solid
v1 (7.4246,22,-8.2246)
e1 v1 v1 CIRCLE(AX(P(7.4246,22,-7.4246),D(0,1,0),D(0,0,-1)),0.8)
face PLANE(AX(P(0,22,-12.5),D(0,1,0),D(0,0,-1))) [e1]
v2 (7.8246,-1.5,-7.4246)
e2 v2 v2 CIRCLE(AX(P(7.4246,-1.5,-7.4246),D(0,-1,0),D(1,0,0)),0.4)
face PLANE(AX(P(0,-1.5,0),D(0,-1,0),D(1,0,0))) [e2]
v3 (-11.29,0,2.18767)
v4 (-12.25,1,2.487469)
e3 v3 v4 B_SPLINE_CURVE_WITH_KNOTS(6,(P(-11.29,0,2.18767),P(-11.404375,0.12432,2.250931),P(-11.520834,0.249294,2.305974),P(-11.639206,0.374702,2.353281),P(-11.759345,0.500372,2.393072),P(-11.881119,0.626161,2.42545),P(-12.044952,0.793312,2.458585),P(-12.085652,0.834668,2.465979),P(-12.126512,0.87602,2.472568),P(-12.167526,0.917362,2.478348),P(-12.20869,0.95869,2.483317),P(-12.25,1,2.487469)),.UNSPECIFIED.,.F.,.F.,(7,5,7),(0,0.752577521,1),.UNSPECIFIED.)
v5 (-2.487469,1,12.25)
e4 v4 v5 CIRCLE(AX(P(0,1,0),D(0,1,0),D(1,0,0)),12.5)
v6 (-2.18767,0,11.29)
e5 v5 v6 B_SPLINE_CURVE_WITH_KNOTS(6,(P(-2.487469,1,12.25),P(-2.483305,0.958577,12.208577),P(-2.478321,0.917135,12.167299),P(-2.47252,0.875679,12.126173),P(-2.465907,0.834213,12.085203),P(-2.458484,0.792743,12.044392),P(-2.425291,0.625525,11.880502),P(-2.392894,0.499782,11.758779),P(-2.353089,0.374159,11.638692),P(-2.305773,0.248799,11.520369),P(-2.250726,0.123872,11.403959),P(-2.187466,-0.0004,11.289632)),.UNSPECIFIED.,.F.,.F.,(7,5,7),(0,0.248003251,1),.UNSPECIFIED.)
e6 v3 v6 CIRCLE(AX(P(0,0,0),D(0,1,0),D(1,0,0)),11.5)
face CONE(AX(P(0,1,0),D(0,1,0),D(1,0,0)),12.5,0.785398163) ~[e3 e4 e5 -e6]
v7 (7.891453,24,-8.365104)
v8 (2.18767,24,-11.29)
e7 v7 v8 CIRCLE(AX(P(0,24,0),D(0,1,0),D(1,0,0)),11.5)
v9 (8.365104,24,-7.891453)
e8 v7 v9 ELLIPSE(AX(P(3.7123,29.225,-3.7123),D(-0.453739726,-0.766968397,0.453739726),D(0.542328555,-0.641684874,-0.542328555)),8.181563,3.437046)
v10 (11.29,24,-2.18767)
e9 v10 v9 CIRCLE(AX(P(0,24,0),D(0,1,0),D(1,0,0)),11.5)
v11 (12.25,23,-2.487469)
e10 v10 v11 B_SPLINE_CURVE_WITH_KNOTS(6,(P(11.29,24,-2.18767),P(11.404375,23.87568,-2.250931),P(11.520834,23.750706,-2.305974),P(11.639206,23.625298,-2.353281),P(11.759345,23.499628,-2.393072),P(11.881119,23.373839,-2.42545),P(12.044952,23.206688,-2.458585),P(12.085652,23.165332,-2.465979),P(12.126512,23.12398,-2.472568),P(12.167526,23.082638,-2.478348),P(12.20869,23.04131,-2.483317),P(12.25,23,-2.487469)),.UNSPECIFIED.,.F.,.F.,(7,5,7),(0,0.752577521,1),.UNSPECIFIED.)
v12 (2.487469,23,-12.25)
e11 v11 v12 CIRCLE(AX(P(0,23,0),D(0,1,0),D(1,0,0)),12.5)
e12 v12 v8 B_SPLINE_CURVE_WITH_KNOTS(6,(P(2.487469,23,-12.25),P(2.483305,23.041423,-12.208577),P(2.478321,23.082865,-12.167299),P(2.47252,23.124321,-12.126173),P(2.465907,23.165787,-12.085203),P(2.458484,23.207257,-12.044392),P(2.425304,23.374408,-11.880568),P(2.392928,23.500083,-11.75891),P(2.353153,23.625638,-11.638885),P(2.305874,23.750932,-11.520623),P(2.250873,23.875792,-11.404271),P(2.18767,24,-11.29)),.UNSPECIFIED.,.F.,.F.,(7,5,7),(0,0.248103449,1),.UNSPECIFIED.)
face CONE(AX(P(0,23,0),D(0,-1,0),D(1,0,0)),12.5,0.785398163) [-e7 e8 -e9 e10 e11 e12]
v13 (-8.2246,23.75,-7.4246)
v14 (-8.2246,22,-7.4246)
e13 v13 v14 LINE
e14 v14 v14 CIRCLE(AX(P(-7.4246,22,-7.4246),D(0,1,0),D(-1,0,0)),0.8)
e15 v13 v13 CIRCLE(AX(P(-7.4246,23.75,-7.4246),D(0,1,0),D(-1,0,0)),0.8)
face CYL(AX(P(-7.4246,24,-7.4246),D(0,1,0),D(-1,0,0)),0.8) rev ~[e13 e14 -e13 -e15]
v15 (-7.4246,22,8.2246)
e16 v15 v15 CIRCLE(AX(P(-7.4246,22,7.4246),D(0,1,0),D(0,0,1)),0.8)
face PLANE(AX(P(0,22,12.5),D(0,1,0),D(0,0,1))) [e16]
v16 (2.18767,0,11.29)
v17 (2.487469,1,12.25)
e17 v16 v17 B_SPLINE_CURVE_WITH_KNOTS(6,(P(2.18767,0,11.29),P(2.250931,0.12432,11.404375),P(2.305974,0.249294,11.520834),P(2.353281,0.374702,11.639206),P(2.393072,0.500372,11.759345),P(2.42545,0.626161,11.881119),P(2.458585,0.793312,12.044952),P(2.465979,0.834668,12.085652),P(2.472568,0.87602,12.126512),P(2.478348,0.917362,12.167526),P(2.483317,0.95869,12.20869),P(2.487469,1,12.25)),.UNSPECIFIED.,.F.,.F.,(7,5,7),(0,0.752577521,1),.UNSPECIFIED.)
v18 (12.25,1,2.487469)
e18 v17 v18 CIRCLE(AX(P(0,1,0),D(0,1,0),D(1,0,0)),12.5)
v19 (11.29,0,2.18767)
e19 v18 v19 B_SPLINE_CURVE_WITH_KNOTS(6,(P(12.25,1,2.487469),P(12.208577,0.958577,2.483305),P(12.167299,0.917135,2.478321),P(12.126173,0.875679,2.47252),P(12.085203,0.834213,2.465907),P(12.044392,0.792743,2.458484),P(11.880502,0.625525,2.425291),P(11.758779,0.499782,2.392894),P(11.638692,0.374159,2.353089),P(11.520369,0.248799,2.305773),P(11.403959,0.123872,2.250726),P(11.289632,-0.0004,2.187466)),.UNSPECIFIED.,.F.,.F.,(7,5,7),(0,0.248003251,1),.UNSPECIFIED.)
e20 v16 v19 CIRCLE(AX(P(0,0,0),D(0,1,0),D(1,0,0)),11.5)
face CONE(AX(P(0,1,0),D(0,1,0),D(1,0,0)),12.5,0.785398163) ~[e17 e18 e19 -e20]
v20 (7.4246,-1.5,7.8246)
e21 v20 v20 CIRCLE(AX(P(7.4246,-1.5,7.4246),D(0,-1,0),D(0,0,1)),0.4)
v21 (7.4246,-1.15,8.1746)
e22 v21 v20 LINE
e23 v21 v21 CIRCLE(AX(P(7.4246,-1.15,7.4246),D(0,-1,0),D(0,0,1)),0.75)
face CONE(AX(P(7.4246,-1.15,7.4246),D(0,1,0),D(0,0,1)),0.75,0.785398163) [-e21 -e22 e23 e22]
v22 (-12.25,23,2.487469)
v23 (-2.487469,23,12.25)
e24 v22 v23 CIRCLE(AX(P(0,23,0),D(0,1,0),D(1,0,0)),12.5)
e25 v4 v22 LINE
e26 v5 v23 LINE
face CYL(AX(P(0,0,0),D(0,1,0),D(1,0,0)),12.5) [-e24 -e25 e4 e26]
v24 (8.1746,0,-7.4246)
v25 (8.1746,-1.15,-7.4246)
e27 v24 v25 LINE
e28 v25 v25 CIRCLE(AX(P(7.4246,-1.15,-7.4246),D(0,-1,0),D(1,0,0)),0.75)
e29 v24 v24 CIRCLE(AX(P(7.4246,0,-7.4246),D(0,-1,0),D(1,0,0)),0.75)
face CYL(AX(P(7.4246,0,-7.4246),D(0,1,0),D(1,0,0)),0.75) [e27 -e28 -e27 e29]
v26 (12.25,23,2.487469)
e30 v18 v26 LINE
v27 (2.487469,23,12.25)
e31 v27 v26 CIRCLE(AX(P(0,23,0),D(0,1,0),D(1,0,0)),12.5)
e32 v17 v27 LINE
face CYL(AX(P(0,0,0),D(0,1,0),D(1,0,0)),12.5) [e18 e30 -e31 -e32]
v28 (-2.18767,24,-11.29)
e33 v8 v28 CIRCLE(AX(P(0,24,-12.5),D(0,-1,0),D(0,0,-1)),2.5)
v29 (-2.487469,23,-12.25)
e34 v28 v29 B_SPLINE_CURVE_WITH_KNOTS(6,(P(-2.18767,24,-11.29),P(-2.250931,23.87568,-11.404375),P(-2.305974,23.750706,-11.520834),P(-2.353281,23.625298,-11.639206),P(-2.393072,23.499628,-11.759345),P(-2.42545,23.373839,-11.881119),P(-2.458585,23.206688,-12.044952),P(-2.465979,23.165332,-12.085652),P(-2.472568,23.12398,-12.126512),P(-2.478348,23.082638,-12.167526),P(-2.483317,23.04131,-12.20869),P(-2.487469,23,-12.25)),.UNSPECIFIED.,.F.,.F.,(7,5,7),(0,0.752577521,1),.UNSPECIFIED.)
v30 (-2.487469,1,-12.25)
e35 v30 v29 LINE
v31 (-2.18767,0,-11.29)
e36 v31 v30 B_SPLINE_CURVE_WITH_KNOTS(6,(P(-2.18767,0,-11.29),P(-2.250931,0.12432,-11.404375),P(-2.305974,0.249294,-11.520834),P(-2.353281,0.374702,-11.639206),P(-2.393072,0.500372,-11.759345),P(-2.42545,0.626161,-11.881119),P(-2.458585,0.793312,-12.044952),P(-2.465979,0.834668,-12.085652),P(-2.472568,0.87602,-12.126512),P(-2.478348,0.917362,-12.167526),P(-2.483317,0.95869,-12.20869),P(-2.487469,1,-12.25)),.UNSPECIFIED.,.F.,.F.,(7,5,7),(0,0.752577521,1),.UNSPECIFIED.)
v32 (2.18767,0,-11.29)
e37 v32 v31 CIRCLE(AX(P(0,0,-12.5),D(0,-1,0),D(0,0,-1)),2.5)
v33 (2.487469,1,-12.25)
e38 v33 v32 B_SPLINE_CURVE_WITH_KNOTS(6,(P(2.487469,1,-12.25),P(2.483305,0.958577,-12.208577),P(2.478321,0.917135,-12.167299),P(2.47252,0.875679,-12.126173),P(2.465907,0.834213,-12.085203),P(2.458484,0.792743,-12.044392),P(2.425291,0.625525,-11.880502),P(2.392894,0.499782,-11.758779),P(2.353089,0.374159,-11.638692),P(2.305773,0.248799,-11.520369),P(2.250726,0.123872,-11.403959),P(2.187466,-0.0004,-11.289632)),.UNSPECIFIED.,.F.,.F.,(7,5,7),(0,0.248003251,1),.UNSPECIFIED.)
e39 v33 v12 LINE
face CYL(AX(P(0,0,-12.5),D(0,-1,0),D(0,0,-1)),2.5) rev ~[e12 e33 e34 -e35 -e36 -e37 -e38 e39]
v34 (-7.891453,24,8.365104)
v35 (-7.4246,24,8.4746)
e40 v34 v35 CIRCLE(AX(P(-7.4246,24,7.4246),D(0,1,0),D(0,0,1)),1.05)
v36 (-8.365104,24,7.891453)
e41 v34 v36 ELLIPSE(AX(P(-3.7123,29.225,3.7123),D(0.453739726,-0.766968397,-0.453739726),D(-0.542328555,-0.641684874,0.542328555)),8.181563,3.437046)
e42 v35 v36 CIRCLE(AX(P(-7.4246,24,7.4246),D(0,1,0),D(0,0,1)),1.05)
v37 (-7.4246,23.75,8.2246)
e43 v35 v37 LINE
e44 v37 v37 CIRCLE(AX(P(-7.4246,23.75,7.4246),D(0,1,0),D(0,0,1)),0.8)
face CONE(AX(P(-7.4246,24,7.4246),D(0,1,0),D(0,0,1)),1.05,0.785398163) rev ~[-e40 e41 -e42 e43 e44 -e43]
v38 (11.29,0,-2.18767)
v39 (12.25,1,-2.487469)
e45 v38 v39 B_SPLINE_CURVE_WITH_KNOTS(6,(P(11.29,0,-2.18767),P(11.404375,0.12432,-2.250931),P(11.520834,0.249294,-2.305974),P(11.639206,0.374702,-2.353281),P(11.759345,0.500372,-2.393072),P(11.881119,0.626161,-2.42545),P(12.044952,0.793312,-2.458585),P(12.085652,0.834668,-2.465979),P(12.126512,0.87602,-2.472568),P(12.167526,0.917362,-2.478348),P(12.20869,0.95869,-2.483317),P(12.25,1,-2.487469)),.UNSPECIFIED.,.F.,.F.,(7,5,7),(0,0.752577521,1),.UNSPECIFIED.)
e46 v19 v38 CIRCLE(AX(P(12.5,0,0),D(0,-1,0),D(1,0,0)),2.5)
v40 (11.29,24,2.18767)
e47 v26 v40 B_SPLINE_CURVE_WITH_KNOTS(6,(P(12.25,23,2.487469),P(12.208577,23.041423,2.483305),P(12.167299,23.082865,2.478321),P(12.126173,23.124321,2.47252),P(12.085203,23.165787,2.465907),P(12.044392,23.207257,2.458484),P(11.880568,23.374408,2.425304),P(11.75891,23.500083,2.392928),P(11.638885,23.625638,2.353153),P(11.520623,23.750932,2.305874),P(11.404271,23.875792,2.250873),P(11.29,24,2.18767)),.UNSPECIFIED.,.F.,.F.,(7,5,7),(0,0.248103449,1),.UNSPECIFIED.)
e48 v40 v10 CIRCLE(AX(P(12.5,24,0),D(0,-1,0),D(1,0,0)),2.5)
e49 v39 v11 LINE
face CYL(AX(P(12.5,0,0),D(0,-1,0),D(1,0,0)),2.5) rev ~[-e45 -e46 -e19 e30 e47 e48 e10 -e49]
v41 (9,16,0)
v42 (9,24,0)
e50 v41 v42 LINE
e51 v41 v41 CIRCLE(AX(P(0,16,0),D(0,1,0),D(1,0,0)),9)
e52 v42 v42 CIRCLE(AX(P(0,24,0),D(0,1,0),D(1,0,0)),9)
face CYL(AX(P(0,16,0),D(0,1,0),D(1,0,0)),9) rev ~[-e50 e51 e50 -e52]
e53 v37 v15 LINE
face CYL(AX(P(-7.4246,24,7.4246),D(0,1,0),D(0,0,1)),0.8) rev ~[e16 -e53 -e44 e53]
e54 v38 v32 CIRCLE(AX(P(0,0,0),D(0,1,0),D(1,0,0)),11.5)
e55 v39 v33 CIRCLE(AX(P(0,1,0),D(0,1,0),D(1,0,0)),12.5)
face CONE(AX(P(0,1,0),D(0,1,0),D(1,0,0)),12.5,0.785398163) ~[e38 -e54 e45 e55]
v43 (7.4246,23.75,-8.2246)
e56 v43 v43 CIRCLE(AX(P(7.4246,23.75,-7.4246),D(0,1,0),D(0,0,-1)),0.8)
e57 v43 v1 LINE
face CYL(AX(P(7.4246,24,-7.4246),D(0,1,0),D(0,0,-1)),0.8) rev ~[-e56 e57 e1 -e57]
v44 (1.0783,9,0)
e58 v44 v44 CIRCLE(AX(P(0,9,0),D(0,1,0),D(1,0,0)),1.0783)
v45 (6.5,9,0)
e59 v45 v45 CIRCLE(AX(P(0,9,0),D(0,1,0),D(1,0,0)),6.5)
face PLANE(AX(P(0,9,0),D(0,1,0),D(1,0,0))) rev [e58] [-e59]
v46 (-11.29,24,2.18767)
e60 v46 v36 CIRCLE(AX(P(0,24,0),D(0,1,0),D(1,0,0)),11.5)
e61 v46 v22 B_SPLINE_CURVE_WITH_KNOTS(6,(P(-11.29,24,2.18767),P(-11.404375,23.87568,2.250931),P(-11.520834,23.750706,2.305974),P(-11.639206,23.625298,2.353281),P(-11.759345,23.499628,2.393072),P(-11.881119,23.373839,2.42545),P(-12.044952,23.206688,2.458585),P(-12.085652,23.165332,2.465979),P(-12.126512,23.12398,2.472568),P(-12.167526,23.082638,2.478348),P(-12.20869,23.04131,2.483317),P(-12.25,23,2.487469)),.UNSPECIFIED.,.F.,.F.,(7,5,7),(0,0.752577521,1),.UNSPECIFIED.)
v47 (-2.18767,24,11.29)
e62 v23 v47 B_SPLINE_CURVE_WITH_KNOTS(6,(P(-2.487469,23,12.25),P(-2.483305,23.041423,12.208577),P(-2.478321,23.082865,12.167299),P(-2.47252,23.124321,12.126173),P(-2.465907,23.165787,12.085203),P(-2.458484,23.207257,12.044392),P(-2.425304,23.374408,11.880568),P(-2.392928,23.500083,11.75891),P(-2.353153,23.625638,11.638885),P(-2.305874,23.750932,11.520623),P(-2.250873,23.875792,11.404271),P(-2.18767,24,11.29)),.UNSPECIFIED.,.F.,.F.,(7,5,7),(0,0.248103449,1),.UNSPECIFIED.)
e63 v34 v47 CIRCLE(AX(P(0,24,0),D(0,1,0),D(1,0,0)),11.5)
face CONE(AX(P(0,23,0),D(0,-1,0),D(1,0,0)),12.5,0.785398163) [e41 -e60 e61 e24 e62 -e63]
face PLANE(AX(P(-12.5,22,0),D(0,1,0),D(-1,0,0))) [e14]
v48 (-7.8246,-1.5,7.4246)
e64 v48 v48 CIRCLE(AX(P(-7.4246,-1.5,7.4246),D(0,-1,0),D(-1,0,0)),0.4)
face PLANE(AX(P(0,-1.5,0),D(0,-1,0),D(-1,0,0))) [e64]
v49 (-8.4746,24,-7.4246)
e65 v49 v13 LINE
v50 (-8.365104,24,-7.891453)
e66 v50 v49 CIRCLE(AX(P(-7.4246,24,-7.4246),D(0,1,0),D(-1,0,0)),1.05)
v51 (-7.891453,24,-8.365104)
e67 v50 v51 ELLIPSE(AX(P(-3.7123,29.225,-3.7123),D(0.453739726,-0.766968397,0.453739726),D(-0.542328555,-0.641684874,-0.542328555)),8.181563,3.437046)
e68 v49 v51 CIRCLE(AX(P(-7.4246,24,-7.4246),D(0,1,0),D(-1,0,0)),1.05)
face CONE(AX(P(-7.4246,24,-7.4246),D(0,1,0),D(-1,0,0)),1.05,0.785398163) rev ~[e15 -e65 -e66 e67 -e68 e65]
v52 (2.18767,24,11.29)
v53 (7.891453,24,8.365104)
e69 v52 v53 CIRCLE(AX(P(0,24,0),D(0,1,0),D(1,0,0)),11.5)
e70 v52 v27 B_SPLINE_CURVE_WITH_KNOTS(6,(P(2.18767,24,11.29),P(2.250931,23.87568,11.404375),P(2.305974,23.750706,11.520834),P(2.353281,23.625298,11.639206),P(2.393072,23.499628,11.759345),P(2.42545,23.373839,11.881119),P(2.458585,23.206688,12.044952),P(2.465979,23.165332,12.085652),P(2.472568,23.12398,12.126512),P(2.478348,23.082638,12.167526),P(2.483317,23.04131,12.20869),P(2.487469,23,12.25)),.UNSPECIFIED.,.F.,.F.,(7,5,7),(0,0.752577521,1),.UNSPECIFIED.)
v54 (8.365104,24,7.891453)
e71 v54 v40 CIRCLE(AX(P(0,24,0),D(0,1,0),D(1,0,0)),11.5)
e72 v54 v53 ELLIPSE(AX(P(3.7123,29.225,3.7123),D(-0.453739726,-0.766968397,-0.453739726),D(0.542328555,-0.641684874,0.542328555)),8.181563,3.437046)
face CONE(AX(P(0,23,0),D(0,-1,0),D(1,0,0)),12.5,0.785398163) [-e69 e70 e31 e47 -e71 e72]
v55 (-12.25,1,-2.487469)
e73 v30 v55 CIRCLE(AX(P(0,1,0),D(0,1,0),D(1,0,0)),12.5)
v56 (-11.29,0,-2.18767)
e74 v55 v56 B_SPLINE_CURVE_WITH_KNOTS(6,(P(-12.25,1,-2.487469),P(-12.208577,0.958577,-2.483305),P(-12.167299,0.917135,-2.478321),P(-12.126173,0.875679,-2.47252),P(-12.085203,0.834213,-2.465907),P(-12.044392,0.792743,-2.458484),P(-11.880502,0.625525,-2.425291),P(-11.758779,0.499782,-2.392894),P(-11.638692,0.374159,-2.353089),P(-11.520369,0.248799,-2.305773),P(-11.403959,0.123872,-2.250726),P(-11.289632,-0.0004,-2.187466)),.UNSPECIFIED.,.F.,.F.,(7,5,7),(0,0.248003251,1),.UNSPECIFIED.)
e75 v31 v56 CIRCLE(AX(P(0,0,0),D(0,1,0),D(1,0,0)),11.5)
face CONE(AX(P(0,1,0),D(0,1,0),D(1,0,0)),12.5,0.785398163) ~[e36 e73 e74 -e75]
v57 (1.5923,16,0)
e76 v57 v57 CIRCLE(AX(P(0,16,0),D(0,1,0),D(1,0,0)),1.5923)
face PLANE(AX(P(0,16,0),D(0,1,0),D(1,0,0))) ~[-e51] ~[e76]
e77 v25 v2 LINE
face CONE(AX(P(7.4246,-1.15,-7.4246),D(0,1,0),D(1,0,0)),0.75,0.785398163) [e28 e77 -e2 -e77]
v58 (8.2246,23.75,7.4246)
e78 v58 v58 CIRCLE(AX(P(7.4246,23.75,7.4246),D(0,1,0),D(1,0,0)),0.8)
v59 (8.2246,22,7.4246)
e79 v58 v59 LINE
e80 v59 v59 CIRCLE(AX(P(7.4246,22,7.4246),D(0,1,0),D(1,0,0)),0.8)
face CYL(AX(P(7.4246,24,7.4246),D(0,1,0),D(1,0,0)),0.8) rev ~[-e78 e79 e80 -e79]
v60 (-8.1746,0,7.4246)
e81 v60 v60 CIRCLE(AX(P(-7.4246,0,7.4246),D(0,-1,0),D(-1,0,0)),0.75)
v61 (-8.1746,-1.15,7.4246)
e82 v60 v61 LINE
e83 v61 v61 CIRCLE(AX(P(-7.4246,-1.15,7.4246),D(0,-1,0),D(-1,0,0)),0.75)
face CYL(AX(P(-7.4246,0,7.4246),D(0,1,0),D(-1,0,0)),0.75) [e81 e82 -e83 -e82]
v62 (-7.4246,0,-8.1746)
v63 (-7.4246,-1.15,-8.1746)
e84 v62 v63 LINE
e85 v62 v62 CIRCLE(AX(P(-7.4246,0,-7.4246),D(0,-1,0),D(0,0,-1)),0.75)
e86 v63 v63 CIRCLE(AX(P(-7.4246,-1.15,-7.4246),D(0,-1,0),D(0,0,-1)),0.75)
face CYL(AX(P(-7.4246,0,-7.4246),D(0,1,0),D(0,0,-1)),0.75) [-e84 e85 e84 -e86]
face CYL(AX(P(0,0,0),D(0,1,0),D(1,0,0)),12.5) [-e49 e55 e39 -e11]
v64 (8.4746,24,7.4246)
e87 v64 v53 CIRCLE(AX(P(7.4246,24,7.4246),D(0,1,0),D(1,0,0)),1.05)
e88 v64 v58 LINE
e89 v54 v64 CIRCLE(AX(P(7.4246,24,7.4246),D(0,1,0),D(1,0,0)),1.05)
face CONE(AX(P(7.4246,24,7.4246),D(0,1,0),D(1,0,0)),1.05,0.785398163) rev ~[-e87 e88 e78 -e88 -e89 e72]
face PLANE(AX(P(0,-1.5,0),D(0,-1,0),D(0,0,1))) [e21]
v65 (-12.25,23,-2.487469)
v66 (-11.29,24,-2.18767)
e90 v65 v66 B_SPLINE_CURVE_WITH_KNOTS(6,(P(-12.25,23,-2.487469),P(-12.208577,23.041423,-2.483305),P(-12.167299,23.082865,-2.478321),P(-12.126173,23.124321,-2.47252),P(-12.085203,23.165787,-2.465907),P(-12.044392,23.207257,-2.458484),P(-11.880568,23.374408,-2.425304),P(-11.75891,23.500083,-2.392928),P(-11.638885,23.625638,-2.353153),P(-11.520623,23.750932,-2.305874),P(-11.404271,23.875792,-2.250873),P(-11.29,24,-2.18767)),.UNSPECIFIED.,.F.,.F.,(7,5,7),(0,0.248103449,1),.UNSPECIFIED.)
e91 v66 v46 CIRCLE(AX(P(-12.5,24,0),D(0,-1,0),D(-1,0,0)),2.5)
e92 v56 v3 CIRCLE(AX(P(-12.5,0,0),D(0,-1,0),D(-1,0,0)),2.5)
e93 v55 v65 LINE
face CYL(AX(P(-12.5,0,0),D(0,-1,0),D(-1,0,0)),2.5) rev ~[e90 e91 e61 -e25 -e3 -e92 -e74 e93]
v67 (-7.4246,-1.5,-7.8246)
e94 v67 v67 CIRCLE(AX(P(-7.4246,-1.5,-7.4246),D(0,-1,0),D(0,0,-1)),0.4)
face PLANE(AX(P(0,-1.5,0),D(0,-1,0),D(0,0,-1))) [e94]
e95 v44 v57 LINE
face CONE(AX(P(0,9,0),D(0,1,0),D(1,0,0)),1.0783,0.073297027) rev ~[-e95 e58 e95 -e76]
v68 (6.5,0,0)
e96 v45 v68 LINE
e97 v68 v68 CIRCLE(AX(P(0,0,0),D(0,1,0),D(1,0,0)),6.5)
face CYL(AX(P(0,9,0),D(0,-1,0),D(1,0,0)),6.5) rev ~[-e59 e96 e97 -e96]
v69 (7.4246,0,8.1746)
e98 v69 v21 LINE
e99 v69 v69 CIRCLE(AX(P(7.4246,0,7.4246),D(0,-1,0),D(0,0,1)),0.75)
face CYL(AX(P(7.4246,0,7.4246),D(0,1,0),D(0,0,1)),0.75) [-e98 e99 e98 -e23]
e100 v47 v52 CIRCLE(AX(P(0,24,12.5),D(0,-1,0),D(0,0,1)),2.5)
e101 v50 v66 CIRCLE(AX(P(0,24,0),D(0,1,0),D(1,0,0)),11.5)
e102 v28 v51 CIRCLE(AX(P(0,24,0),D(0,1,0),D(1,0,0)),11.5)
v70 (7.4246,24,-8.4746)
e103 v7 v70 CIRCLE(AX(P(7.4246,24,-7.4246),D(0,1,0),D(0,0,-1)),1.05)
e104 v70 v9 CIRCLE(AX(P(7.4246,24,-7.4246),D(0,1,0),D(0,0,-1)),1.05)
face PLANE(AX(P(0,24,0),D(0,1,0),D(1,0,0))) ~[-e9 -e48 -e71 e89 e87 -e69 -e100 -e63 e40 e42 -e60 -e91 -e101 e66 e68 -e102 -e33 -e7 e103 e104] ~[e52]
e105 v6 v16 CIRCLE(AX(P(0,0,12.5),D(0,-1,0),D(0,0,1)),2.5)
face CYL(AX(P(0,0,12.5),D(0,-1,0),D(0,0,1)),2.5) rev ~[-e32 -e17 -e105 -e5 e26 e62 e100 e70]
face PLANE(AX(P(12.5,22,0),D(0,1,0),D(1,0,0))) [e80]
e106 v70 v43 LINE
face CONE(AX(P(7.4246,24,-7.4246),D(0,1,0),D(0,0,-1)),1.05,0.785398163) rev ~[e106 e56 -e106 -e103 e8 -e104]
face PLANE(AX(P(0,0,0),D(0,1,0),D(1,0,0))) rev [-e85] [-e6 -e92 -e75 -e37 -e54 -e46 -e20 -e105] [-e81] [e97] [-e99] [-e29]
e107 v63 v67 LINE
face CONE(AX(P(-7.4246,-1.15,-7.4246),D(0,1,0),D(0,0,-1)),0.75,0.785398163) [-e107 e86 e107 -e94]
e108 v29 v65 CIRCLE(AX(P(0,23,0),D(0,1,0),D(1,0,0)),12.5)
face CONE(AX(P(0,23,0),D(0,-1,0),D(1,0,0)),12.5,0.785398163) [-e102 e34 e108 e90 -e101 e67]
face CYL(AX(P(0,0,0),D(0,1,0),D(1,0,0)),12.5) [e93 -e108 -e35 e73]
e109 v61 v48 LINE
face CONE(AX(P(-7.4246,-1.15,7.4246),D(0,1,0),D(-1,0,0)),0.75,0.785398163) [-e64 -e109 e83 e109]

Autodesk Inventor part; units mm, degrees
ref_plane "YZ Plane" through (0, 0, 0) normal (1, 0, 0) x (0, 1, 0)
ref_plane "XZ Plane" through (0, 0, 0) normal (0, 1, 0) x (-1, 0, 0)
ref_plane "XY Plane" through (0, 0, 0) normal (0, 0, 1) x (1, 0, 0)
sketch "Sketch1" plane through (0, 0, 0) normal (0, 0, 1) x (1, 0, 0)
  line L0 (0, 0) -> (0, 19.4488) construction
  line L1 (0, 0) -> (15.8946, 0) construction
  line L2 (1.0783, 9) -> (1.5923, 16)
  line L3 (1.0783, 9) -> (6.5, 9)
  line L4 (6.5, 9) -> (6.5, 0)
  line L5 (6.5, 0) -> (12.5, 0)
  line L6 (12.5, 0) -> (12.5, 24)
  line L7 (1.5923, 16) -> (9, 16)
  line L8 (9, 16) -> (9, 24)
  line L9 (9, 24) -> (12.5, 24)
  line L10 (1.0783, 9) -> (1.0049, 8) construction
  line L11 (1.0049, 8) -> (0.7849, 8) construction
  line L12 (1.5923, 16) -> (2.5, 28.36) construction
  line L13 (2.5, 28.36) -> (1.5, 28.36) construction
  line L14 (0.7849, 8) -> (0.4645, 1) construction
  line L15 (0.4645, 1) -> (0.2, 1) construction
  line L16 (0.2, 1) -> (1.5, 28.36) construction
  line L17 (0, 6.7) -> (1.1563, 6.7) construction
  line L18 (0.4708, 6.7) -> (0.4708, 8.6077) construction
  dimension "d1" = 12.5
  dimension "d2" = 6.5
  dimension "d7" = 9
  dimension "d8" = 9
  dimension "d45" = 24
  dimension "d46" = 8
  dimension "d47" = 4.2
  dimension "d49" = 20.36
  dimension "d50" = 2.5
  dimension "d51" = 2.62
  dimension "d53" = 0.22
  dimension "d54" = 7
  dimension "d55" = 0.2
  dimension "d56" = 1
  dimension "d57" = 5.7
  dimension "d58" = 2.3
revolve "Revolution1" add sketch "Sketch1" angle 360 about axis through (0, 0, 0) along (0, 1, 0)
chamfer "Chamfer2" distance 1 angle 45 2 edges at (-12.5, 0, 0) (-12.5, 24, 0)
sketch "Sketch2" plane through (0, 0, 0) normal (0, -1, 0) x (1, 0, 0)
  circle A0 centre (0, 0) radius 1.0783 construction
  circle A1 centre (0, 0) radius 10.5 construction
  circle A2 centre (0, 0) radius 1.5923 construction
  line L0 (0, 0) -> (19.4803, 0) construction
  line L1 (0, 0) -> (20.4554, -20.4554) construction
  circle A3 centre (7.4246, -7.4246) radius 0.75
  circle A4 centre (0, 0) radius 12.5
  circle A5 centre (12.5, 0) radius 2.5
  point P0 (12.25, 2.4875)
  point P1 (12.25, -2.4875)
  dimension "d19" = 21
  dimension "d23" = 25
  dimension "d20" = 45
  dimension "d21" = 1.5
  dimension "d22" = 5
extrude "Extrusion1" cut sketch "Sketch2" against normal through all contours A4 A5 picked at (11.6823, -0.4803)
extrude "Extrusion2" add sketch "Sketch2" along normal blind 1.5 contours A3
chamfer "Chamfer3" distance 0.35 angle 45 1 edges at (6.6746, -1.5, -7.4246)
pattern_circular "Circular Pattern1" count 4 over 360 about axis through (0, -10, 0) along (0, 1, 0) of "Extrusion1", "Extrusion2", "Chamfer3"
sketch "Sketch3" plane through (12.5, 24, 0) normal (0, 1, 0) x (1, 0, 0)
  circle A0 centre (-12.5, 0) radius 1.0783 construction
  line L0 (-12.5, 0) -> (0.4785, 0) construction
  line L1 (-12.5, 0) -> (-1.2806, -11.2194) construction
  circle A1 centre (-12.5, 0) radius 10.5 construction
  circle A2 centre (-5.0754, -7.4246) radius 0.8
  dimension "d34" = 21
  dimension "d35" = 45
  dimension "d36" = 1.6
extrude "Extrusion3" cut sketch "Sketch3" against normal blind 2
chamfer "Chamfer4" distance 0.25 angle 45 1 edges at (6.6246, 24, 7.4246)
pattern_circular "Circular Pattern2" count 4 over 360 about axis through (0, -10, 0) along (0, 1, 0) of "Extrusion3", "Chamfer4"
equation "\"d57\" = cutpipette_length"
equation "\"cutpipette_length\" = 5.7"
properties part number "cpd_lowrcf_0.7_p3_v1"
